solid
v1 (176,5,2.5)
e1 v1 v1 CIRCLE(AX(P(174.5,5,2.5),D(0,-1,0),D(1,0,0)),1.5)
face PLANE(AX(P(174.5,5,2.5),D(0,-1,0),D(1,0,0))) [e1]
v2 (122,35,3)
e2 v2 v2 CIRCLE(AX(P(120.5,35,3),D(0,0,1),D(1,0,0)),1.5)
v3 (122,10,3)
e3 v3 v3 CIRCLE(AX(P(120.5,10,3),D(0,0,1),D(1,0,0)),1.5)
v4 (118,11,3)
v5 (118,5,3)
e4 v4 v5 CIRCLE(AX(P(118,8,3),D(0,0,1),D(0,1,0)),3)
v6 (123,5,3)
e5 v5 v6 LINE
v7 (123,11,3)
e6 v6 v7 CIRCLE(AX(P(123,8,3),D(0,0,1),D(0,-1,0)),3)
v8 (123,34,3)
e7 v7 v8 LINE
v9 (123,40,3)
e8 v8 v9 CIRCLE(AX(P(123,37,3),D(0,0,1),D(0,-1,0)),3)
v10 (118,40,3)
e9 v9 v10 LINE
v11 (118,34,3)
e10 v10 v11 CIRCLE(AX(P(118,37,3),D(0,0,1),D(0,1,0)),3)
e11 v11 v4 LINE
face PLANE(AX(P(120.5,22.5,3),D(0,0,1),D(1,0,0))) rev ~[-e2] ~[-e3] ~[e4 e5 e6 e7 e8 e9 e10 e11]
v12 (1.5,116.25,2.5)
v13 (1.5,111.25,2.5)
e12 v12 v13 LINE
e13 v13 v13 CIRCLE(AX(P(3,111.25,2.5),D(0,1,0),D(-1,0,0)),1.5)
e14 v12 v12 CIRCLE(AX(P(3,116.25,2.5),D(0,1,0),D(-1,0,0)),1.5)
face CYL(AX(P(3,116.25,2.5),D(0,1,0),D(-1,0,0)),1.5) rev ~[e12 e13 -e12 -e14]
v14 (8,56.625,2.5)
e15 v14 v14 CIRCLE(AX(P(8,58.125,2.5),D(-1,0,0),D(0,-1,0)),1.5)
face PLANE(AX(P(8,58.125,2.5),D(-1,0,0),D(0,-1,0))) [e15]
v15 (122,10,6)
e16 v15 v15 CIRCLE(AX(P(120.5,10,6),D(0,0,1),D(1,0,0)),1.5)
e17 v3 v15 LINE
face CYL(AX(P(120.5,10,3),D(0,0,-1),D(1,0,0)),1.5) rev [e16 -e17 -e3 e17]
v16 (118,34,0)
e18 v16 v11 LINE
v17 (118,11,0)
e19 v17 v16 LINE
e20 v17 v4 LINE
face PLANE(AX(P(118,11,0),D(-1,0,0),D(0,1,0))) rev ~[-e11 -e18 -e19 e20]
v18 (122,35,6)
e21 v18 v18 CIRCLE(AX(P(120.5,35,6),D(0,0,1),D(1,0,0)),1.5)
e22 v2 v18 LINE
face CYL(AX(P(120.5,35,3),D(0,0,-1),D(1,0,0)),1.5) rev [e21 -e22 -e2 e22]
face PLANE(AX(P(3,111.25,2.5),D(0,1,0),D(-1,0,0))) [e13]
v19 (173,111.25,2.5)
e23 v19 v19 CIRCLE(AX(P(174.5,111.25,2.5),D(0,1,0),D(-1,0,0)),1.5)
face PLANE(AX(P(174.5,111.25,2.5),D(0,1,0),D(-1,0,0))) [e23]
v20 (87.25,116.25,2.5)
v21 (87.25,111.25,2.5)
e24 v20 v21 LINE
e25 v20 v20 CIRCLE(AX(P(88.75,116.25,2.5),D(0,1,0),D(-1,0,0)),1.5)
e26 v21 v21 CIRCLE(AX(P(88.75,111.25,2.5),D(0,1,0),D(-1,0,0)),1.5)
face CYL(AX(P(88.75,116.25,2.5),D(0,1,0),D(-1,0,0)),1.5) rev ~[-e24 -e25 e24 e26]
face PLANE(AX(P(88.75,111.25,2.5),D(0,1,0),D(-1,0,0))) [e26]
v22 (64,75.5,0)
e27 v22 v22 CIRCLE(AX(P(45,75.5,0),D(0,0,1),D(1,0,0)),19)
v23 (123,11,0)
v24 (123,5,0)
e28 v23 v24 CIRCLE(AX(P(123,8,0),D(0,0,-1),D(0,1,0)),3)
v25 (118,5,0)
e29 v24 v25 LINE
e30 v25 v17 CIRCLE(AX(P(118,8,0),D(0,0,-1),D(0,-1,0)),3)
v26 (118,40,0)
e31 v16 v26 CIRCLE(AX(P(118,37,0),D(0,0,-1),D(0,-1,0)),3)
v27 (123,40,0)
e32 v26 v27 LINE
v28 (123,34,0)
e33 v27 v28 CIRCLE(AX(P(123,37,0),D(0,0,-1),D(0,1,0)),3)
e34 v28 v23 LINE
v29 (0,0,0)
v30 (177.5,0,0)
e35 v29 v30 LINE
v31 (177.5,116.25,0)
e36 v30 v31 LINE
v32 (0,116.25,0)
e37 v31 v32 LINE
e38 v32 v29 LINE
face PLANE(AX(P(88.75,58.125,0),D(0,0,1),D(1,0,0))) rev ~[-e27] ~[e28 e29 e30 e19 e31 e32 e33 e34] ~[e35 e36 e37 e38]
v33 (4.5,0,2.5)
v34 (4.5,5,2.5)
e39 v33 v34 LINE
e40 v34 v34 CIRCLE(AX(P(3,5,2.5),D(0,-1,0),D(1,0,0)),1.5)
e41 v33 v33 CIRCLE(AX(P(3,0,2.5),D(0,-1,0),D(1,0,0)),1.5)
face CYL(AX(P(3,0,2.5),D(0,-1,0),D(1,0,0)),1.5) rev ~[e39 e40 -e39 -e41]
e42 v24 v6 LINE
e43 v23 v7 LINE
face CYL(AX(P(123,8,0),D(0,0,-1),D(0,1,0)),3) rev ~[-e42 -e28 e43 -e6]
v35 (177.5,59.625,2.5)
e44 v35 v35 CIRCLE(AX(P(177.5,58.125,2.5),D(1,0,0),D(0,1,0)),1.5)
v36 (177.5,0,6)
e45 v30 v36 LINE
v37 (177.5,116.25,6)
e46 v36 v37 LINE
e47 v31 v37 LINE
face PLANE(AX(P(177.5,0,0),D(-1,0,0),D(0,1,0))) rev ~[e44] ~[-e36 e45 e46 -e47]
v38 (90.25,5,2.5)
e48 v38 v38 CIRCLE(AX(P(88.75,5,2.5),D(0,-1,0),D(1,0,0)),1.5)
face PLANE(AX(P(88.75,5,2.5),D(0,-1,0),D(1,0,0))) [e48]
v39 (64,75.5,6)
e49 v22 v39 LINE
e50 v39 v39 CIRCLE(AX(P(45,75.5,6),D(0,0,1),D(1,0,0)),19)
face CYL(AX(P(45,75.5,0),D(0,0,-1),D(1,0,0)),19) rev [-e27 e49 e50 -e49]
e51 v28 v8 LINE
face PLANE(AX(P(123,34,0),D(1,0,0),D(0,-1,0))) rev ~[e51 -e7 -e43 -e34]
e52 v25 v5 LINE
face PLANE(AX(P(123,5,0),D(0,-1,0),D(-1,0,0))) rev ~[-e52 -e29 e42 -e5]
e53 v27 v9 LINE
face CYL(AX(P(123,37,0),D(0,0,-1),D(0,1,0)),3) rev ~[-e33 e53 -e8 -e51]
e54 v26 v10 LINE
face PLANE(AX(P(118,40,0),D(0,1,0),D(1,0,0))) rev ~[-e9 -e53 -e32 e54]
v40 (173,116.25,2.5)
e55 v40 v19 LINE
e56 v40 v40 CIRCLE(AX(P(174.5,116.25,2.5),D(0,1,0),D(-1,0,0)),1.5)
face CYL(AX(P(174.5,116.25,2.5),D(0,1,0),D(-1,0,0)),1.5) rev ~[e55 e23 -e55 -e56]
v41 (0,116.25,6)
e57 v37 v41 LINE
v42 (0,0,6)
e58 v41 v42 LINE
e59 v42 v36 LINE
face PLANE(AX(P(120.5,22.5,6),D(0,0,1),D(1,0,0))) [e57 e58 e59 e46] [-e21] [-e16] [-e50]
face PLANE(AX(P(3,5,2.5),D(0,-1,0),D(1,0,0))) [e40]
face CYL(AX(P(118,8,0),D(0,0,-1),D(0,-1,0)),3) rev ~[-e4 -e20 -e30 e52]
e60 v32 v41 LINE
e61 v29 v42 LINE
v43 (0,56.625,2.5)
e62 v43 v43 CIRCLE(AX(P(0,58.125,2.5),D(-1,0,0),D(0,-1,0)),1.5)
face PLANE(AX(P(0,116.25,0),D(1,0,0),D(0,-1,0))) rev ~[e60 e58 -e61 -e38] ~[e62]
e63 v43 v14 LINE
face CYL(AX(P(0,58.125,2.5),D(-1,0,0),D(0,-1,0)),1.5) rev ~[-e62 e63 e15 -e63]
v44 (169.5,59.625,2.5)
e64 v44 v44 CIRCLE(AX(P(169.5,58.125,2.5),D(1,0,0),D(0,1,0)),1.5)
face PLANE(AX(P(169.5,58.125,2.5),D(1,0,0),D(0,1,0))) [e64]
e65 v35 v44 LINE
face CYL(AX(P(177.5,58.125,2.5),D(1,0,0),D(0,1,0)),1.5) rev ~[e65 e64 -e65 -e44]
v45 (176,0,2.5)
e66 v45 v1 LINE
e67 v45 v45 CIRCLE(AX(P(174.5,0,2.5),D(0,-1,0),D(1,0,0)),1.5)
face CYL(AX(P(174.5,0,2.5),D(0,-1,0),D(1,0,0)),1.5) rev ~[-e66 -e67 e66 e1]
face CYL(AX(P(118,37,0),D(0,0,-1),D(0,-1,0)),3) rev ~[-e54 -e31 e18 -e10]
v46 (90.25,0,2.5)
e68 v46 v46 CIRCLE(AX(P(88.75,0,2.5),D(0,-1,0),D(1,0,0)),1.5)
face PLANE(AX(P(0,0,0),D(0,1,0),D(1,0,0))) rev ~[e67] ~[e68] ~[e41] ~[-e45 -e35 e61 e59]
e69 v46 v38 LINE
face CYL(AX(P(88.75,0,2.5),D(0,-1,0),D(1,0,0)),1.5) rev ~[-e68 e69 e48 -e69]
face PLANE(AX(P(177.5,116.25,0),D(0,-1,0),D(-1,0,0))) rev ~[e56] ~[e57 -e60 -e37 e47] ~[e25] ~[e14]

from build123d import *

# Parameters (mm, degrees)
F0_R      = 19
F1_DEPTH  = 6
F2_START  = 3
F0_R_2    = 1.5
F2_DEPTH  = 3
F3_R      = 1.5
F4_DEPTH  = 8
F5_R      = 1.5
F6_DEPTH  = 8
F7_R      = 1.5
F8_DEPTH  = 5
F9_R      = 1.5
F10_DEPTH = 5


# Not quite as in the source:
# - a feature names something its author has since deleted; it is built from what else it names


with BuildPart() as f1:
    # F0 (on Top) → F1 (new body)
    with BuildSketch(Plane.XY):
        Polygon((0, 116.25), (0, 0), (177.5, 0), (177.5, 5), (177.5, 40), (177.5, 52.125), (177.5, 64.125), (177.5, 116.25), align=None)
        with BuildLine():
            ThreePointArc((123, 40), (126, 37), (123, 34))
            Line((123, 34), (123, 11))
            ThreePointArc((123, 11), (126, 8), (123, 5))
            Line((123, 5), (118, 5))
            ThreePointArc((118, 5), (115, 8), (118, 11))
            Line((118, 11), (118, 34))
            ThreePointArc((118, 34), (115, 37), (118, 40))
            Line((118, 40), (123, 40))
        make_face(mode=Mode.SUBTRACT)
        with Locations((45, 75.5)):
            Circle(F0_R, mode=Mode.SUBTRACT)
    extrude(amount=F1_DEPTH)

    # F0 (on Top) → F2 (join)
    with BuildSketch(Plane.XY.offset(F2_START)):
        with BuildLine():
            Line((123, 11), (123, 34))
            ThreePointArc((123, 34), (126, 37), (123, 40))
            Line((123, 40), (118, 40))
            ThreePointArc((118, 40), (115, 37), (118, 34))
            Line((118, 34), (118, 11))
            ThreePointArc((118, 11), (115, 8), (118, 5))
            Line((118, 5), (123, 5))
            ThreePointArc((123, 5), (126, 8), (123, 11))
        make_face()
        with Locations((120.5, 10)):
            Circle(F0_R_2, mode=Mode.SUBTRACT)
        with Locations((120.5, 35)):
            Circle(F0_R_2, mode=Mode.SUBTRACT)
    extrude(amount=F2_DEPTH)

    # F3 (on face) → F4 (cut)
    with BuildSketch(Plane.YZ.offset(177.5)):
        with Locations((58.125, 2.5)):
            Circle(F3_R)
    extrude(amount=-F4_DEPTH, mode=Mode.SUBTRACT)

    # F5 (on face) → F6 (cut)
    with BuildSketch(Plane(origin=(0, 0, 0), x_dir=(0, -1, 0), z_dir=(-1, 0, 0))):
        with Locations((-58.125, 2.5)):
            Circle(F5_R)
    extrude(amount=-F6_DEPTH, mode=Mode.SUBTRACT)

    # F7 (on face) → F8 (cut)
    with BuildSketch(Plane.XZ):
        with Locations((3, 2.5)):
            Circle(F7_R)
        with Locations((88.75, 2.5)):
            Circle(F7_R)
        with Locations((174.5, 2.5)):
            Circle(F7_R)
    extrude(amount=-F8_DEPTH, mode=Mode.SUBTRACT)

    # F9 (on face) → F10 (cut)
    with BuildSketch(Plane(origin=(0, 116.25, 0), x_dir=(-1, 0, 0), z_dir=(0, 1, 0))):
        with Locations((-3, 2.5)):
            Circle(F9_R)
        with Locations((-88.75, 2.5)):
            Circle(F9_R)
        with Locations((-174.5, 2.5)):
            Circle(F9_R)
    extrude(amount=-F10_DEPTH, mode=Mode.SUBTRACT)


solid = f1.part
